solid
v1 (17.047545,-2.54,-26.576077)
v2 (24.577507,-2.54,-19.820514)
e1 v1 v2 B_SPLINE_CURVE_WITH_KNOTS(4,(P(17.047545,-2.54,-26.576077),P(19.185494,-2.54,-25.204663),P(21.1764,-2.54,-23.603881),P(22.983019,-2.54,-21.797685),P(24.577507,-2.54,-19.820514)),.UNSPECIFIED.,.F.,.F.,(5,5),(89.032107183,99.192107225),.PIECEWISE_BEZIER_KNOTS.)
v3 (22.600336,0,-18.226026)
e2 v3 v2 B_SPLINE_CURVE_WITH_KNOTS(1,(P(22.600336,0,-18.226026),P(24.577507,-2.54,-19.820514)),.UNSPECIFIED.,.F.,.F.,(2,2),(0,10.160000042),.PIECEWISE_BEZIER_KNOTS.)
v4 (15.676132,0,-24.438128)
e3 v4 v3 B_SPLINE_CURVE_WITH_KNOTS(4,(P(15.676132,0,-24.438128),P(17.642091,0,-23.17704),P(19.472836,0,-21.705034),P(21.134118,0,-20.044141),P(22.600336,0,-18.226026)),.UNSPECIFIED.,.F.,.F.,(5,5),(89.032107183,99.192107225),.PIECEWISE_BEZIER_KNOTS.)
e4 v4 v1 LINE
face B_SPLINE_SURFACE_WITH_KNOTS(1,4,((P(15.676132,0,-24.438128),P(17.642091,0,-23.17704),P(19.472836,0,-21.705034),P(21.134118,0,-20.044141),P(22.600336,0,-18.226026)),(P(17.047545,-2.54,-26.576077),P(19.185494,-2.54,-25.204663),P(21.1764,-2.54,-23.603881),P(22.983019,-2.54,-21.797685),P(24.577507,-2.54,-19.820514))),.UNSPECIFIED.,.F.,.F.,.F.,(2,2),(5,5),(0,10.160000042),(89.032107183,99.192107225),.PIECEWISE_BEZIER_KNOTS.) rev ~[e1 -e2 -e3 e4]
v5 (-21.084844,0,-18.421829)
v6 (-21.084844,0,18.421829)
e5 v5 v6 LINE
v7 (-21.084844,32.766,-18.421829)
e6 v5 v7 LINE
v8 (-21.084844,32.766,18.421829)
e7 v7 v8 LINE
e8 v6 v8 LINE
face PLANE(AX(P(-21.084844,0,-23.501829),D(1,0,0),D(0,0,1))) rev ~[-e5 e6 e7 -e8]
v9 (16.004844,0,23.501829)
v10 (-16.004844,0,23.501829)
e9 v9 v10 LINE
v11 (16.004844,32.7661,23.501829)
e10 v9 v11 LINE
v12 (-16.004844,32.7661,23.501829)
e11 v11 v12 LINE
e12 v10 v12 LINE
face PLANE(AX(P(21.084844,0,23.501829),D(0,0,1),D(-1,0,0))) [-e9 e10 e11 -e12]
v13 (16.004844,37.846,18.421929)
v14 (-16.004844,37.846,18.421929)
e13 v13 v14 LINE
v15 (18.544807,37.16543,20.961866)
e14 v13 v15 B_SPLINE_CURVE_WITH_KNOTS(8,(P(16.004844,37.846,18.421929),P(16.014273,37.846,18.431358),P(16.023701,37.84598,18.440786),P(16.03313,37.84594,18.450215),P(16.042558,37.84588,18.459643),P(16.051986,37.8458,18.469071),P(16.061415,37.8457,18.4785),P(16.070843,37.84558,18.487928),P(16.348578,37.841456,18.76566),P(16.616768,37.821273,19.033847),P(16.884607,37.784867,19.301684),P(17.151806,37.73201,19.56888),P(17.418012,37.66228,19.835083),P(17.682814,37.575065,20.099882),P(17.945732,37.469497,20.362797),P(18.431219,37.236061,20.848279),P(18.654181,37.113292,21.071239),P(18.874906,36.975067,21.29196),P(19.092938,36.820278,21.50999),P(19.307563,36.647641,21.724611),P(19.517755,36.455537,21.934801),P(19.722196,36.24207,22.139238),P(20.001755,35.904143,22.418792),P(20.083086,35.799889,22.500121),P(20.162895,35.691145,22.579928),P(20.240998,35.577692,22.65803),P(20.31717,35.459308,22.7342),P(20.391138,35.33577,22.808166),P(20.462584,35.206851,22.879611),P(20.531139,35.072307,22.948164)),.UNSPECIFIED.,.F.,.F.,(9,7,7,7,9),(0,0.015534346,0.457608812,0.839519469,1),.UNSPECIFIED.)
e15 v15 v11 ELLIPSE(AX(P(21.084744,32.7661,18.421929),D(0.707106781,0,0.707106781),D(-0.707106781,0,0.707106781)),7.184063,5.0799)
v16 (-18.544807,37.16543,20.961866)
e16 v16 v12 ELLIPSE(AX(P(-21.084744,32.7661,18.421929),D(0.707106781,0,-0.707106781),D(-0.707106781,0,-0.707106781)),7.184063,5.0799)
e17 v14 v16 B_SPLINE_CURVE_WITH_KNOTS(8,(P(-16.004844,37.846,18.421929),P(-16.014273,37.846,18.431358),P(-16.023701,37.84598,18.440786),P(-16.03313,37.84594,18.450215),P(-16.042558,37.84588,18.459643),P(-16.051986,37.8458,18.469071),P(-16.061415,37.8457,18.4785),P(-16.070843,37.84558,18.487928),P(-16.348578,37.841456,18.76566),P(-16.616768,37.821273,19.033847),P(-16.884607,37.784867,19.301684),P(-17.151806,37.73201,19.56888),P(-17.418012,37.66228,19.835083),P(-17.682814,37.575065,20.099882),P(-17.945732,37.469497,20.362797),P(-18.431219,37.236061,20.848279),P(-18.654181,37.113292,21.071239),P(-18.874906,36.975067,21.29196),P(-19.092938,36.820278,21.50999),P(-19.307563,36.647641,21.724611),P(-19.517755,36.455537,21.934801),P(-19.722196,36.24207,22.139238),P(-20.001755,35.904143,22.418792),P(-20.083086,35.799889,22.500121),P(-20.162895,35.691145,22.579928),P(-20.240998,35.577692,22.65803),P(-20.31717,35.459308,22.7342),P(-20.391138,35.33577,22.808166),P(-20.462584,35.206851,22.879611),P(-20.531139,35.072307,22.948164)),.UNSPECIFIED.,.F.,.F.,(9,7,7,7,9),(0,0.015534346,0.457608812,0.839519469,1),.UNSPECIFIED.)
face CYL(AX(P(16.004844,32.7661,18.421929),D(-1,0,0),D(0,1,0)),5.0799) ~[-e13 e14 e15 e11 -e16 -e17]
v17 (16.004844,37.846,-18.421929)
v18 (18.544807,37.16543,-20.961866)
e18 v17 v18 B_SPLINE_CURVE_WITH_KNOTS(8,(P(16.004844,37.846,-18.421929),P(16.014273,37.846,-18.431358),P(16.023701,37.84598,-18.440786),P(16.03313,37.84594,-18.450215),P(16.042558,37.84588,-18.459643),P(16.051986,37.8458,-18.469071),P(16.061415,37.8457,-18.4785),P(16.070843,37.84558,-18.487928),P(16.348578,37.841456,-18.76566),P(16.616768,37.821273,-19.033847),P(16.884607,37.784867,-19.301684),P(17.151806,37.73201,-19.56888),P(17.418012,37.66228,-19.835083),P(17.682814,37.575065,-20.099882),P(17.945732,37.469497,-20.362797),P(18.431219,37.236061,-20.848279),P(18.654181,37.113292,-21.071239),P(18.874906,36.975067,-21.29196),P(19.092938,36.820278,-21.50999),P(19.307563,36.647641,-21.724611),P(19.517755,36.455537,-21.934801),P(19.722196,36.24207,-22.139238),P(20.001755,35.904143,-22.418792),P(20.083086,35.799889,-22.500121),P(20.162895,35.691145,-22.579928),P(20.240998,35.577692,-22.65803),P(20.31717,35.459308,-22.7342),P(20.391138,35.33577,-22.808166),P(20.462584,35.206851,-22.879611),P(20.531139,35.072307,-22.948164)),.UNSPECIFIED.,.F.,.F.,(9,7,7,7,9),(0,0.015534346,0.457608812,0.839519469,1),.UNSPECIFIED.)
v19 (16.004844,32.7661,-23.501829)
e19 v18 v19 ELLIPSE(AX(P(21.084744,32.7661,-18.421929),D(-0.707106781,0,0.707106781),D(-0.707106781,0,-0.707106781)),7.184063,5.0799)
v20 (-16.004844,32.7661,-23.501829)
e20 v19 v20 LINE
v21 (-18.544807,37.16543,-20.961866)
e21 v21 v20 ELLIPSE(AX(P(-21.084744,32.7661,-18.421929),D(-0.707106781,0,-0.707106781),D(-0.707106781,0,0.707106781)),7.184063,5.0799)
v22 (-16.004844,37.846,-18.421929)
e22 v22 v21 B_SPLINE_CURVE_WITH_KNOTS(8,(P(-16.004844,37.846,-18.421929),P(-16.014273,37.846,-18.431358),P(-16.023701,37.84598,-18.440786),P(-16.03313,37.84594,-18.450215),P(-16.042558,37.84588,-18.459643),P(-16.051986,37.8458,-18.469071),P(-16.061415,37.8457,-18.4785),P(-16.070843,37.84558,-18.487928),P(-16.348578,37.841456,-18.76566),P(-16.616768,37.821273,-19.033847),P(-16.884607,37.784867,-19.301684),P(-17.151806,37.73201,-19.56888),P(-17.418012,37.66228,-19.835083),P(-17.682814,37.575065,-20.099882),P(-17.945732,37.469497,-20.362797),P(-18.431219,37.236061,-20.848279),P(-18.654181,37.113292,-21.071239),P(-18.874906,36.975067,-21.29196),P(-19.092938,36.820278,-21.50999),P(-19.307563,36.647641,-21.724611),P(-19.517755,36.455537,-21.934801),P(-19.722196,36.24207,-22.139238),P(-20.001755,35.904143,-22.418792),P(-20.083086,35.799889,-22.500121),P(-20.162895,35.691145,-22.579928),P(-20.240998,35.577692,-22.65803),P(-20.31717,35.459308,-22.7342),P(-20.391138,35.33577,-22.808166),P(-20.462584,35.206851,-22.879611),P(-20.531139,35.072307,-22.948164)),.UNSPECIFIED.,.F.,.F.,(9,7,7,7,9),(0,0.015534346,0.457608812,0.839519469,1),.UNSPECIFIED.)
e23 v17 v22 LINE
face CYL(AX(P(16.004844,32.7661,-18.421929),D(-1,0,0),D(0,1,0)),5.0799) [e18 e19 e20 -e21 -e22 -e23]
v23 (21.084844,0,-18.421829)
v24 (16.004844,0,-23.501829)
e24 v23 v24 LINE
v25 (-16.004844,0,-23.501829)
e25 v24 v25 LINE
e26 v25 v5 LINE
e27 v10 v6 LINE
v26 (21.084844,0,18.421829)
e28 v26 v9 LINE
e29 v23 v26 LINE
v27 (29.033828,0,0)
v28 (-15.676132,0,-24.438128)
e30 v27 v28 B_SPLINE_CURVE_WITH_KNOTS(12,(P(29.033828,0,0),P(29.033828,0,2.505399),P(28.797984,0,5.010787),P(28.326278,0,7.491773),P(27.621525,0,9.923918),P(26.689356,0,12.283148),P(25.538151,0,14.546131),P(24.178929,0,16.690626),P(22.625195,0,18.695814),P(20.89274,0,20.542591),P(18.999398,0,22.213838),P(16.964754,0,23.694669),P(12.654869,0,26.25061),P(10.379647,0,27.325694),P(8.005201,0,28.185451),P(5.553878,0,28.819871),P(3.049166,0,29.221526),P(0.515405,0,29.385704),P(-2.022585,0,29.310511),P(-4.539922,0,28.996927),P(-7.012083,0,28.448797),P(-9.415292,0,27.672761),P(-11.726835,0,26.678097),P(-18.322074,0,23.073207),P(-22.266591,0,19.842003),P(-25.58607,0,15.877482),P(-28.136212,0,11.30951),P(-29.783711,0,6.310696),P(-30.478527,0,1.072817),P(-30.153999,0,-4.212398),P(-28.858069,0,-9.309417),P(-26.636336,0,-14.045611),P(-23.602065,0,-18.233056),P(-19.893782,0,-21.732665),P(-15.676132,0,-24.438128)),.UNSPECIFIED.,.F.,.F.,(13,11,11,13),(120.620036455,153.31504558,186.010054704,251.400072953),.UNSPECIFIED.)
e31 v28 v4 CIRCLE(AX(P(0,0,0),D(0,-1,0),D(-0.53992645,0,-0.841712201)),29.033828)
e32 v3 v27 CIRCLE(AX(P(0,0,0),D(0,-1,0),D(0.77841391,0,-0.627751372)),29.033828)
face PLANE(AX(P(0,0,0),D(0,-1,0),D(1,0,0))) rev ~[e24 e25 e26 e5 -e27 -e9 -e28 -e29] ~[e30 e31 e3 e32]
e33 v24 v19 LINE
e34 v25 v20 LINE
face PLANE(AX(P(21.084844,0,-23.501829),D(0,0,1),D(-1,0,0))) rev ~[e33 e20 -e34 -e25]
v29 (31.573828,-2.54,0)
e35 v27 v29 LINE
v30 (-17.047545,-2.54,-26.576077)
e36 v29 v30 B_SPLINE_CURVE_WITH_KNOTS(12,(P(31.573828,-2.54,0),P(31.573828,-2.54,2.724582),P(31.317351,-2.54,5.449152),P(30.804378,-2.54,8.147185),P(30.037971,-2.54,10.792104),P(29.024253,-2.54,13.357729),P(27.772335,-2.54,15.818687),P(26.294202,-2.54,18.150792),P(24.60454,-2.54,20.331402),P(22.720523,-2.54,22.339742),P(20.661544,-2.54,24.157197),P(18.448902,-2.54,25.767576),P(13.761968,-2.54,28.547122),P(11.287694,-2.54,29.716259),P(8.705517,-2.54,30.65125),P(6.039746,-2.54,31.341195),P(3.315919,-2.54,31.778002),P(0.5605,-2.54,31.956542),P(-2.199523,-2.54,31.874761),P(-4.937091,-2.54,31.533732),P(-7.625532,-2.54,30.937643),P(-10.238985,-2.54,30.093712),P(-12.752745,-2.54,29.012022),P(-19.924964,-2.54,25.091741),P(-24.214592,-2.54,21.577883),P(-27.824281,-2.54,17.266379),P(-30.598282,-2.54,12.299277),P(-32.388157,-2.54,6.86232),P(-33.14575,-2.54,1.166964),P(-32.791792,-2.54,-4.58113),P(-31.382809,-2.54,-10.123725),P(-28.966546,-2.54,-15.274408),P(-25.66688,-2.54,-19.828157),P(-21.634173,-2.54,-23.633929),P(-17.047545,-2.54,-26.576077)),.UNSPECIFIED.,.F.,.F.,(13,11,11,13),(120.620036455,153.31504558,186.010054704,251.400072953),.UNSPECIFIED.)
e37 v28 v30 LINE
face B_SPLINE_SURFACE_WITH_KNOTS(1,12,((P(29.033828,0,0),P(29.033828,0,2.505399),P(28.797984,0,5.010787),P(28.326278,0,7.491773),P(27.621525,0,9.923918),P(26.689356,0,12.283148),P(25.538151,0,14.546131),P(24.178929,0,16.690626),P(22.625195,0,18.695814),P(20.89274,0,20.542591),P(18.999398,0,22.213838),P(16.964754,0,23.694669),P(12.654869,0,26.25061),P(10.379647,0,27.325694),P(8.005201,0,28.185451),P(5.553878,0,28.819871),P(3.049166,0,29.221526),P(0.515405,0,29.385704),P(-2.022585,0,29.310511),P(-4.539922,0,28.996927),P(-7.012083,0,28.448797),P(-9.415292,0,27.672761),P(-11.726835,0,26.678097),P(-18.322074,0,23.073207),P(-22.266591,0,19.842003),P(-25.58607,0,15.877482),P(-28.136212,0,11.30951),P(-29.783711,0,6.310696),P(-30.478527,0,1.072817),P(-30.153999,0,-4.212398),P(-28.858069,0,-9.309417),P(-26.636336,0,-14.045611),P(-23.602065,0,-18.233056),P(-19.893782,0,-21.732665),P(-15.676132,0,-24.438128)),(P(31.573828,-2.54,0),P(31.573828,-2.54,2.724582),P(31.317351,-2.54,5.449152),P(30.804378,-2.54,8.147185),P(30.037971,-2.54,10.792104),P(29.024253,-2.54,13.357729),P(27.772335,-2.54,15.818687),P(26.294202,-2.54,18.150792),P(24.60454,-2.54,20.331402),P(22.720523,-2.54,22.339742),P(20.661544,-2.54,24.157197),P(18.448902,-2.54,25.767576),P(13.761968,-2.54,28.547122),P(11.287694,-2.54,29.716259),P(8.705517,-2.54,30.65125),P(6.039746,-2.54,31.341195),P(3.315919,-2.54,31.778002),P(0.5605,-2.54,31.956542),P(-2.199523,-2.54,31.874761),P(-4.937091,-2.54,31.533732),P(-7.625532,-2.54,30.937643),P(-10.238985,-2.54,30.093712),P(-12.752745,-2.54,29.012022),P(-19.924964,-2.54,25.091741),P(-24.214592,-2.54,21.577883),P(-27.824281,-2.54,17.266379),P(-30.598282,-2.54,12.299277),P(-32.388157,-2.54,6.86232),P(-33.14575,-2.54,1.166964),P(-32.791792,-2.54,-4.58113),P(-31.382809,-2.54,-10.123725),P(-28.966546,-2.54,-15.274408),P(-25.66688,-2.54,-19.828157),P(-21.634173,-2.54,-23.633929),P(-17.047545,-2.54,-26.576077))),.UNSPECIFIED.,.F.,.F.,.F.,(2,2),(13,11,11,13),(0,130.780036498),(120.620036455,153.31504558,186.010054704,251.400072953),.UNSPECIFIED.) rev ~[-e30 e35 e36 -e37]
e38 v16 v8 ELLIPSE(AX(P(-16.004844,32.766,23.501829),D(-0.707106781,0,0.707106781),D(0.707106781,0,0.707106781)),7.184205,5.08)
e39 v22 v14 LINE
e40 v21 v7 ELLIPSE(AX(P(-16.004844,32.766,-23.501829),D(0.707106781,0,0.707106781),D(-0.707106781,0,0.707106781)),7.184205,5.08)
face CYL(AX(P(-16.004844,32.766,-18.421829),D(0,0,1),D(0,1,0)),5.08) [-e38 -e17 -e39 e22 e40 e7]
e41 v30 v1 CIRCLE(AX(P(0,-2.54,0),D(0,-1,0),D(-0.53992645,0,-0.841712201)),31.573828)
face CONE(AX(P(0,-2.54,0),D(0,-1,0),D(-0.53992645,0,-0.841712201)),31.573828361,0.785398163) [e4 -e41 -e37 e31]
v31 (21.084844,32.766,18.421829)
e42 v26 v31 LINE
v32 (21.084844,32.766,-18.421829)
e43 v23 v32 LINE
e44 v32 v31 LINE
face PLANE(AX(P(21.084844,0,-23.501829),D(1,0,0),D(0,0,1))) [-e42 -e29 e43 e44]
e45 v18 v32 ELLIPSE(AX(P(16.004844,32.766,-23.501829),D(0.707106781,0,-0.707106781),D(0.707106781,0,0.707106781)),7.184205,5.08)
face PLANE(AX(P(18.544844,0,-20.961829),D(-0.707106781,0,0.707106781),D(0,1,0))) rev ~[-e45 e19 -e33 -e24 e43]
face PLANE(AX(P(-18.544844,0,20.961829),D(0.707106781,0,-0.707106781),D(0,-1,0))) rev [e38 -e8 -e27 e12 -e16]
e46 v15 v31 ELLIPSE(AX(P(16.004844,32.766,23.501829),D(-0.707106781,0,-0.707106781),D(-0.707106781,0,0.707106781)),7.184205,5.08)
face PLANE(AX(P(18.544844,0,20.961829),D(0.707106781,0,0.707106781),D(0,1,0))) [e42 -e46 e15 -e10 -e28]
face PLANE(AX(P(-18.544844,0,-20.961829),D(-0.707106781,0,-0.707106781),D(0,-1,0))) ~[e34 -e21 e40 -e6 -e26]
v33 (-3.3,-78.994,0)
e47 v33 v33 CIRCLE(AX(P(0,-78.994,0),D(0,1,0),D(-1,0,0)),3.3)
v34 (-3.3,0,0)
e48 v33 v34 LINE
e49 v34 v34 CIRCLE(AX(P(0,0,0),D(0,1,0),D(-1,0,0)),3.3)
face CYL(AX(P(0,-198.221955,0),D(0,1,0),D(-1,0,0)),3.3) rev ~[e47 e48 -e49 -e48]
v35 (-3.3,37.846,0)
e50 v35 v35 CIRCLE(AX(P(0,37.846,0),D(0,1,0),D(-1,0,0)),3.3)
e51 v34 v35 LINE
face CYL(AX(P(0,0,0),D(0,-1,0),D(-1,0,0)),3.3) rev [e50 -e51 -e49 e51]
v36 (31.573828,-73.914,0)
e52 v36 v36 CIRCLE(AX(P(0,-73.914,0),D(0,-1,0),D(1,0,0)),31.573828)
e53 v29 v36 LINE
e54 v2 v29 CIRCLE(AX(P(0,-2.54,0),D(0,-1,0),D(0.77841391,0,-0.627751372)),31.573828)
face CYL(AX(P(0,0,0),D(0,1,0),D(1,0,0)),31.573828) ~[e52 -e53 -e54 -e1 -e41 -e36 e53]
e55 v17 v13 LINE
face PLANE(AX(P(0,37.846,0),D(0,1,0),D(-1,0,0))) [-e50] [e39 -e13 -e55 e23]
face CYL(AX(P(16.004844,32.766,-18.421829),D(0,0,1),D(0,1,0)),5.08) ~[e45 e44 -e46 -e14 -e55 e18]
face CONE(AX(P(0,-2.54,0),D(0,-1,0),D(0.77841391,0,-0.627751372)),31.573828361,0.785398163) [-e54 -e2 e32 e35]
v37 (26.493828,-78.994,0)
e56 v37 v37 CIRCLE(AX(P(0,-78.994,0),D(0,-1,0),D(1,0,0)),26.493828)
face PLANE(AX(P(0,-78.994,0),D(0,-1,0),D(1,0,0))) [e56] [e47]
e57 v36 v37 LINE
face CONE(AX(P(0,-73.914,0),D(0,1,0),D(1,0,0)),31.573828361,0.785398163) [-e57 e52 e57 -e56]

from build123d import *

# Parameters (mm, degrees)
F0_R     = 31.5738283612
F1_DEPTH = 78.994
F3_D     = 6.6
F5_W     = 42.1696881435
F5_H     = 47.0036589152
F5_R     = 3.3
F6_DEPTH = 37.846
F7_SIZE2 = 5.08
F7_SIZE  = 5.08
F8_F1_R  = 5.08
F8_F2_R  = 5.08
F8_F3_R  = 5.0799
F8_F4_R  = 5.0799
F9_SIZE  = 2.54
F10_SIZE = 5.08


# Not quite as in the source:
# - a fillet or chamfer is up to 0.001 mm smaller than in the source, because OpenCascade refuses the exact size


with BuildPart() as f1:
    # F0 (on Front) → F1 (new body)
    with BuildSketch(Plane.XZ):
        Circle(F0_R)
    extrude(amount=F1_DEPTH)

    # F3 (through all)
    with Locations(Plane.XZ.offset(78.994)):
        with Locations((0, 0)):
            Hole(F3_D / 2)

    # F5 (on face) → F6 (join)
    with BuildSketch(Plane(origin=(0, 0, 0), x_dir=(-1, 0, 0), z_dir=(0, 1, 0))):
        Rectangle(F5_W, F5_H)
        Circle(F5_R, mode=Mode.SUBTRACT)
    extrude(amount=F6_DEPTH)

    # F7
    f7_edges = [f1.edges().sort_by_distance(p)[0] for p in [
        (21.084844, 18.923, 23.501829),
        (21.084844, 18.923, -23.501829),
        (-21.084844, 18.923, 23.501829),
        (-21.084844, 18.923, -23.501829),
    ]]
    chamfer(f7_edges, length=F7_SIZE, length2=F7_SIZE2)

    # F8: fillet of radius 5.08 on 4 edges, made by hand

    # F8_f1
    f8_f1_edges = [f1.edges().sort_by_distance(p)[0] for p in [
        (-21.0848440718, 37.846, 0),
    ]]
    fillet(f8_f1_edges, radius=F8_F1_R)

    # F8_f2
    f8_f2_edges = [f1.edges().sort_by_distance(p)[0] for p in [
        (21.0848440718, 37.846, 0),
    ]]
    fillet(f8_f2_edges, radius=F8_F2_R)

    # F8_f3 (radius 5.08 in the source; OpenCascade refuses exactly that, so slightly less here)
    f8_f3_edges = [f1.edges().sort_by_distance(p)[0] for p in [
        (0, 37.846, -23.5018294576),
    ]]
    fillet(f8_f3_edges, radius=F8_F3_R)

    # F8_f4 (radius 5.08 in the source; OpenCascade refuses exactly that, so slightly less here)
    f8_f4_edges = [f1.edges().sort_by_distance(p)[0] for p in [
        (0, 37.846, 23.5018294576),
    ]]
    fillet(f8_f4_edges, radius=F8_F4_R)

    # F9
    f9_edges = [f1.edges().sort_by_distance(p)[0] for p in [
        (-31.573828, 0, 0),
    ]]
    chamfer(f9_edges, length=F9_SIZE)

    # F10
    f10_edges = [f1.edges().sort_by_distance(p)[0] for p in [
        (-31.573828, -78.994, 0),
    ]]
    chamfer(f10_edges, length=F10_SIZE)


solid = f1.part
